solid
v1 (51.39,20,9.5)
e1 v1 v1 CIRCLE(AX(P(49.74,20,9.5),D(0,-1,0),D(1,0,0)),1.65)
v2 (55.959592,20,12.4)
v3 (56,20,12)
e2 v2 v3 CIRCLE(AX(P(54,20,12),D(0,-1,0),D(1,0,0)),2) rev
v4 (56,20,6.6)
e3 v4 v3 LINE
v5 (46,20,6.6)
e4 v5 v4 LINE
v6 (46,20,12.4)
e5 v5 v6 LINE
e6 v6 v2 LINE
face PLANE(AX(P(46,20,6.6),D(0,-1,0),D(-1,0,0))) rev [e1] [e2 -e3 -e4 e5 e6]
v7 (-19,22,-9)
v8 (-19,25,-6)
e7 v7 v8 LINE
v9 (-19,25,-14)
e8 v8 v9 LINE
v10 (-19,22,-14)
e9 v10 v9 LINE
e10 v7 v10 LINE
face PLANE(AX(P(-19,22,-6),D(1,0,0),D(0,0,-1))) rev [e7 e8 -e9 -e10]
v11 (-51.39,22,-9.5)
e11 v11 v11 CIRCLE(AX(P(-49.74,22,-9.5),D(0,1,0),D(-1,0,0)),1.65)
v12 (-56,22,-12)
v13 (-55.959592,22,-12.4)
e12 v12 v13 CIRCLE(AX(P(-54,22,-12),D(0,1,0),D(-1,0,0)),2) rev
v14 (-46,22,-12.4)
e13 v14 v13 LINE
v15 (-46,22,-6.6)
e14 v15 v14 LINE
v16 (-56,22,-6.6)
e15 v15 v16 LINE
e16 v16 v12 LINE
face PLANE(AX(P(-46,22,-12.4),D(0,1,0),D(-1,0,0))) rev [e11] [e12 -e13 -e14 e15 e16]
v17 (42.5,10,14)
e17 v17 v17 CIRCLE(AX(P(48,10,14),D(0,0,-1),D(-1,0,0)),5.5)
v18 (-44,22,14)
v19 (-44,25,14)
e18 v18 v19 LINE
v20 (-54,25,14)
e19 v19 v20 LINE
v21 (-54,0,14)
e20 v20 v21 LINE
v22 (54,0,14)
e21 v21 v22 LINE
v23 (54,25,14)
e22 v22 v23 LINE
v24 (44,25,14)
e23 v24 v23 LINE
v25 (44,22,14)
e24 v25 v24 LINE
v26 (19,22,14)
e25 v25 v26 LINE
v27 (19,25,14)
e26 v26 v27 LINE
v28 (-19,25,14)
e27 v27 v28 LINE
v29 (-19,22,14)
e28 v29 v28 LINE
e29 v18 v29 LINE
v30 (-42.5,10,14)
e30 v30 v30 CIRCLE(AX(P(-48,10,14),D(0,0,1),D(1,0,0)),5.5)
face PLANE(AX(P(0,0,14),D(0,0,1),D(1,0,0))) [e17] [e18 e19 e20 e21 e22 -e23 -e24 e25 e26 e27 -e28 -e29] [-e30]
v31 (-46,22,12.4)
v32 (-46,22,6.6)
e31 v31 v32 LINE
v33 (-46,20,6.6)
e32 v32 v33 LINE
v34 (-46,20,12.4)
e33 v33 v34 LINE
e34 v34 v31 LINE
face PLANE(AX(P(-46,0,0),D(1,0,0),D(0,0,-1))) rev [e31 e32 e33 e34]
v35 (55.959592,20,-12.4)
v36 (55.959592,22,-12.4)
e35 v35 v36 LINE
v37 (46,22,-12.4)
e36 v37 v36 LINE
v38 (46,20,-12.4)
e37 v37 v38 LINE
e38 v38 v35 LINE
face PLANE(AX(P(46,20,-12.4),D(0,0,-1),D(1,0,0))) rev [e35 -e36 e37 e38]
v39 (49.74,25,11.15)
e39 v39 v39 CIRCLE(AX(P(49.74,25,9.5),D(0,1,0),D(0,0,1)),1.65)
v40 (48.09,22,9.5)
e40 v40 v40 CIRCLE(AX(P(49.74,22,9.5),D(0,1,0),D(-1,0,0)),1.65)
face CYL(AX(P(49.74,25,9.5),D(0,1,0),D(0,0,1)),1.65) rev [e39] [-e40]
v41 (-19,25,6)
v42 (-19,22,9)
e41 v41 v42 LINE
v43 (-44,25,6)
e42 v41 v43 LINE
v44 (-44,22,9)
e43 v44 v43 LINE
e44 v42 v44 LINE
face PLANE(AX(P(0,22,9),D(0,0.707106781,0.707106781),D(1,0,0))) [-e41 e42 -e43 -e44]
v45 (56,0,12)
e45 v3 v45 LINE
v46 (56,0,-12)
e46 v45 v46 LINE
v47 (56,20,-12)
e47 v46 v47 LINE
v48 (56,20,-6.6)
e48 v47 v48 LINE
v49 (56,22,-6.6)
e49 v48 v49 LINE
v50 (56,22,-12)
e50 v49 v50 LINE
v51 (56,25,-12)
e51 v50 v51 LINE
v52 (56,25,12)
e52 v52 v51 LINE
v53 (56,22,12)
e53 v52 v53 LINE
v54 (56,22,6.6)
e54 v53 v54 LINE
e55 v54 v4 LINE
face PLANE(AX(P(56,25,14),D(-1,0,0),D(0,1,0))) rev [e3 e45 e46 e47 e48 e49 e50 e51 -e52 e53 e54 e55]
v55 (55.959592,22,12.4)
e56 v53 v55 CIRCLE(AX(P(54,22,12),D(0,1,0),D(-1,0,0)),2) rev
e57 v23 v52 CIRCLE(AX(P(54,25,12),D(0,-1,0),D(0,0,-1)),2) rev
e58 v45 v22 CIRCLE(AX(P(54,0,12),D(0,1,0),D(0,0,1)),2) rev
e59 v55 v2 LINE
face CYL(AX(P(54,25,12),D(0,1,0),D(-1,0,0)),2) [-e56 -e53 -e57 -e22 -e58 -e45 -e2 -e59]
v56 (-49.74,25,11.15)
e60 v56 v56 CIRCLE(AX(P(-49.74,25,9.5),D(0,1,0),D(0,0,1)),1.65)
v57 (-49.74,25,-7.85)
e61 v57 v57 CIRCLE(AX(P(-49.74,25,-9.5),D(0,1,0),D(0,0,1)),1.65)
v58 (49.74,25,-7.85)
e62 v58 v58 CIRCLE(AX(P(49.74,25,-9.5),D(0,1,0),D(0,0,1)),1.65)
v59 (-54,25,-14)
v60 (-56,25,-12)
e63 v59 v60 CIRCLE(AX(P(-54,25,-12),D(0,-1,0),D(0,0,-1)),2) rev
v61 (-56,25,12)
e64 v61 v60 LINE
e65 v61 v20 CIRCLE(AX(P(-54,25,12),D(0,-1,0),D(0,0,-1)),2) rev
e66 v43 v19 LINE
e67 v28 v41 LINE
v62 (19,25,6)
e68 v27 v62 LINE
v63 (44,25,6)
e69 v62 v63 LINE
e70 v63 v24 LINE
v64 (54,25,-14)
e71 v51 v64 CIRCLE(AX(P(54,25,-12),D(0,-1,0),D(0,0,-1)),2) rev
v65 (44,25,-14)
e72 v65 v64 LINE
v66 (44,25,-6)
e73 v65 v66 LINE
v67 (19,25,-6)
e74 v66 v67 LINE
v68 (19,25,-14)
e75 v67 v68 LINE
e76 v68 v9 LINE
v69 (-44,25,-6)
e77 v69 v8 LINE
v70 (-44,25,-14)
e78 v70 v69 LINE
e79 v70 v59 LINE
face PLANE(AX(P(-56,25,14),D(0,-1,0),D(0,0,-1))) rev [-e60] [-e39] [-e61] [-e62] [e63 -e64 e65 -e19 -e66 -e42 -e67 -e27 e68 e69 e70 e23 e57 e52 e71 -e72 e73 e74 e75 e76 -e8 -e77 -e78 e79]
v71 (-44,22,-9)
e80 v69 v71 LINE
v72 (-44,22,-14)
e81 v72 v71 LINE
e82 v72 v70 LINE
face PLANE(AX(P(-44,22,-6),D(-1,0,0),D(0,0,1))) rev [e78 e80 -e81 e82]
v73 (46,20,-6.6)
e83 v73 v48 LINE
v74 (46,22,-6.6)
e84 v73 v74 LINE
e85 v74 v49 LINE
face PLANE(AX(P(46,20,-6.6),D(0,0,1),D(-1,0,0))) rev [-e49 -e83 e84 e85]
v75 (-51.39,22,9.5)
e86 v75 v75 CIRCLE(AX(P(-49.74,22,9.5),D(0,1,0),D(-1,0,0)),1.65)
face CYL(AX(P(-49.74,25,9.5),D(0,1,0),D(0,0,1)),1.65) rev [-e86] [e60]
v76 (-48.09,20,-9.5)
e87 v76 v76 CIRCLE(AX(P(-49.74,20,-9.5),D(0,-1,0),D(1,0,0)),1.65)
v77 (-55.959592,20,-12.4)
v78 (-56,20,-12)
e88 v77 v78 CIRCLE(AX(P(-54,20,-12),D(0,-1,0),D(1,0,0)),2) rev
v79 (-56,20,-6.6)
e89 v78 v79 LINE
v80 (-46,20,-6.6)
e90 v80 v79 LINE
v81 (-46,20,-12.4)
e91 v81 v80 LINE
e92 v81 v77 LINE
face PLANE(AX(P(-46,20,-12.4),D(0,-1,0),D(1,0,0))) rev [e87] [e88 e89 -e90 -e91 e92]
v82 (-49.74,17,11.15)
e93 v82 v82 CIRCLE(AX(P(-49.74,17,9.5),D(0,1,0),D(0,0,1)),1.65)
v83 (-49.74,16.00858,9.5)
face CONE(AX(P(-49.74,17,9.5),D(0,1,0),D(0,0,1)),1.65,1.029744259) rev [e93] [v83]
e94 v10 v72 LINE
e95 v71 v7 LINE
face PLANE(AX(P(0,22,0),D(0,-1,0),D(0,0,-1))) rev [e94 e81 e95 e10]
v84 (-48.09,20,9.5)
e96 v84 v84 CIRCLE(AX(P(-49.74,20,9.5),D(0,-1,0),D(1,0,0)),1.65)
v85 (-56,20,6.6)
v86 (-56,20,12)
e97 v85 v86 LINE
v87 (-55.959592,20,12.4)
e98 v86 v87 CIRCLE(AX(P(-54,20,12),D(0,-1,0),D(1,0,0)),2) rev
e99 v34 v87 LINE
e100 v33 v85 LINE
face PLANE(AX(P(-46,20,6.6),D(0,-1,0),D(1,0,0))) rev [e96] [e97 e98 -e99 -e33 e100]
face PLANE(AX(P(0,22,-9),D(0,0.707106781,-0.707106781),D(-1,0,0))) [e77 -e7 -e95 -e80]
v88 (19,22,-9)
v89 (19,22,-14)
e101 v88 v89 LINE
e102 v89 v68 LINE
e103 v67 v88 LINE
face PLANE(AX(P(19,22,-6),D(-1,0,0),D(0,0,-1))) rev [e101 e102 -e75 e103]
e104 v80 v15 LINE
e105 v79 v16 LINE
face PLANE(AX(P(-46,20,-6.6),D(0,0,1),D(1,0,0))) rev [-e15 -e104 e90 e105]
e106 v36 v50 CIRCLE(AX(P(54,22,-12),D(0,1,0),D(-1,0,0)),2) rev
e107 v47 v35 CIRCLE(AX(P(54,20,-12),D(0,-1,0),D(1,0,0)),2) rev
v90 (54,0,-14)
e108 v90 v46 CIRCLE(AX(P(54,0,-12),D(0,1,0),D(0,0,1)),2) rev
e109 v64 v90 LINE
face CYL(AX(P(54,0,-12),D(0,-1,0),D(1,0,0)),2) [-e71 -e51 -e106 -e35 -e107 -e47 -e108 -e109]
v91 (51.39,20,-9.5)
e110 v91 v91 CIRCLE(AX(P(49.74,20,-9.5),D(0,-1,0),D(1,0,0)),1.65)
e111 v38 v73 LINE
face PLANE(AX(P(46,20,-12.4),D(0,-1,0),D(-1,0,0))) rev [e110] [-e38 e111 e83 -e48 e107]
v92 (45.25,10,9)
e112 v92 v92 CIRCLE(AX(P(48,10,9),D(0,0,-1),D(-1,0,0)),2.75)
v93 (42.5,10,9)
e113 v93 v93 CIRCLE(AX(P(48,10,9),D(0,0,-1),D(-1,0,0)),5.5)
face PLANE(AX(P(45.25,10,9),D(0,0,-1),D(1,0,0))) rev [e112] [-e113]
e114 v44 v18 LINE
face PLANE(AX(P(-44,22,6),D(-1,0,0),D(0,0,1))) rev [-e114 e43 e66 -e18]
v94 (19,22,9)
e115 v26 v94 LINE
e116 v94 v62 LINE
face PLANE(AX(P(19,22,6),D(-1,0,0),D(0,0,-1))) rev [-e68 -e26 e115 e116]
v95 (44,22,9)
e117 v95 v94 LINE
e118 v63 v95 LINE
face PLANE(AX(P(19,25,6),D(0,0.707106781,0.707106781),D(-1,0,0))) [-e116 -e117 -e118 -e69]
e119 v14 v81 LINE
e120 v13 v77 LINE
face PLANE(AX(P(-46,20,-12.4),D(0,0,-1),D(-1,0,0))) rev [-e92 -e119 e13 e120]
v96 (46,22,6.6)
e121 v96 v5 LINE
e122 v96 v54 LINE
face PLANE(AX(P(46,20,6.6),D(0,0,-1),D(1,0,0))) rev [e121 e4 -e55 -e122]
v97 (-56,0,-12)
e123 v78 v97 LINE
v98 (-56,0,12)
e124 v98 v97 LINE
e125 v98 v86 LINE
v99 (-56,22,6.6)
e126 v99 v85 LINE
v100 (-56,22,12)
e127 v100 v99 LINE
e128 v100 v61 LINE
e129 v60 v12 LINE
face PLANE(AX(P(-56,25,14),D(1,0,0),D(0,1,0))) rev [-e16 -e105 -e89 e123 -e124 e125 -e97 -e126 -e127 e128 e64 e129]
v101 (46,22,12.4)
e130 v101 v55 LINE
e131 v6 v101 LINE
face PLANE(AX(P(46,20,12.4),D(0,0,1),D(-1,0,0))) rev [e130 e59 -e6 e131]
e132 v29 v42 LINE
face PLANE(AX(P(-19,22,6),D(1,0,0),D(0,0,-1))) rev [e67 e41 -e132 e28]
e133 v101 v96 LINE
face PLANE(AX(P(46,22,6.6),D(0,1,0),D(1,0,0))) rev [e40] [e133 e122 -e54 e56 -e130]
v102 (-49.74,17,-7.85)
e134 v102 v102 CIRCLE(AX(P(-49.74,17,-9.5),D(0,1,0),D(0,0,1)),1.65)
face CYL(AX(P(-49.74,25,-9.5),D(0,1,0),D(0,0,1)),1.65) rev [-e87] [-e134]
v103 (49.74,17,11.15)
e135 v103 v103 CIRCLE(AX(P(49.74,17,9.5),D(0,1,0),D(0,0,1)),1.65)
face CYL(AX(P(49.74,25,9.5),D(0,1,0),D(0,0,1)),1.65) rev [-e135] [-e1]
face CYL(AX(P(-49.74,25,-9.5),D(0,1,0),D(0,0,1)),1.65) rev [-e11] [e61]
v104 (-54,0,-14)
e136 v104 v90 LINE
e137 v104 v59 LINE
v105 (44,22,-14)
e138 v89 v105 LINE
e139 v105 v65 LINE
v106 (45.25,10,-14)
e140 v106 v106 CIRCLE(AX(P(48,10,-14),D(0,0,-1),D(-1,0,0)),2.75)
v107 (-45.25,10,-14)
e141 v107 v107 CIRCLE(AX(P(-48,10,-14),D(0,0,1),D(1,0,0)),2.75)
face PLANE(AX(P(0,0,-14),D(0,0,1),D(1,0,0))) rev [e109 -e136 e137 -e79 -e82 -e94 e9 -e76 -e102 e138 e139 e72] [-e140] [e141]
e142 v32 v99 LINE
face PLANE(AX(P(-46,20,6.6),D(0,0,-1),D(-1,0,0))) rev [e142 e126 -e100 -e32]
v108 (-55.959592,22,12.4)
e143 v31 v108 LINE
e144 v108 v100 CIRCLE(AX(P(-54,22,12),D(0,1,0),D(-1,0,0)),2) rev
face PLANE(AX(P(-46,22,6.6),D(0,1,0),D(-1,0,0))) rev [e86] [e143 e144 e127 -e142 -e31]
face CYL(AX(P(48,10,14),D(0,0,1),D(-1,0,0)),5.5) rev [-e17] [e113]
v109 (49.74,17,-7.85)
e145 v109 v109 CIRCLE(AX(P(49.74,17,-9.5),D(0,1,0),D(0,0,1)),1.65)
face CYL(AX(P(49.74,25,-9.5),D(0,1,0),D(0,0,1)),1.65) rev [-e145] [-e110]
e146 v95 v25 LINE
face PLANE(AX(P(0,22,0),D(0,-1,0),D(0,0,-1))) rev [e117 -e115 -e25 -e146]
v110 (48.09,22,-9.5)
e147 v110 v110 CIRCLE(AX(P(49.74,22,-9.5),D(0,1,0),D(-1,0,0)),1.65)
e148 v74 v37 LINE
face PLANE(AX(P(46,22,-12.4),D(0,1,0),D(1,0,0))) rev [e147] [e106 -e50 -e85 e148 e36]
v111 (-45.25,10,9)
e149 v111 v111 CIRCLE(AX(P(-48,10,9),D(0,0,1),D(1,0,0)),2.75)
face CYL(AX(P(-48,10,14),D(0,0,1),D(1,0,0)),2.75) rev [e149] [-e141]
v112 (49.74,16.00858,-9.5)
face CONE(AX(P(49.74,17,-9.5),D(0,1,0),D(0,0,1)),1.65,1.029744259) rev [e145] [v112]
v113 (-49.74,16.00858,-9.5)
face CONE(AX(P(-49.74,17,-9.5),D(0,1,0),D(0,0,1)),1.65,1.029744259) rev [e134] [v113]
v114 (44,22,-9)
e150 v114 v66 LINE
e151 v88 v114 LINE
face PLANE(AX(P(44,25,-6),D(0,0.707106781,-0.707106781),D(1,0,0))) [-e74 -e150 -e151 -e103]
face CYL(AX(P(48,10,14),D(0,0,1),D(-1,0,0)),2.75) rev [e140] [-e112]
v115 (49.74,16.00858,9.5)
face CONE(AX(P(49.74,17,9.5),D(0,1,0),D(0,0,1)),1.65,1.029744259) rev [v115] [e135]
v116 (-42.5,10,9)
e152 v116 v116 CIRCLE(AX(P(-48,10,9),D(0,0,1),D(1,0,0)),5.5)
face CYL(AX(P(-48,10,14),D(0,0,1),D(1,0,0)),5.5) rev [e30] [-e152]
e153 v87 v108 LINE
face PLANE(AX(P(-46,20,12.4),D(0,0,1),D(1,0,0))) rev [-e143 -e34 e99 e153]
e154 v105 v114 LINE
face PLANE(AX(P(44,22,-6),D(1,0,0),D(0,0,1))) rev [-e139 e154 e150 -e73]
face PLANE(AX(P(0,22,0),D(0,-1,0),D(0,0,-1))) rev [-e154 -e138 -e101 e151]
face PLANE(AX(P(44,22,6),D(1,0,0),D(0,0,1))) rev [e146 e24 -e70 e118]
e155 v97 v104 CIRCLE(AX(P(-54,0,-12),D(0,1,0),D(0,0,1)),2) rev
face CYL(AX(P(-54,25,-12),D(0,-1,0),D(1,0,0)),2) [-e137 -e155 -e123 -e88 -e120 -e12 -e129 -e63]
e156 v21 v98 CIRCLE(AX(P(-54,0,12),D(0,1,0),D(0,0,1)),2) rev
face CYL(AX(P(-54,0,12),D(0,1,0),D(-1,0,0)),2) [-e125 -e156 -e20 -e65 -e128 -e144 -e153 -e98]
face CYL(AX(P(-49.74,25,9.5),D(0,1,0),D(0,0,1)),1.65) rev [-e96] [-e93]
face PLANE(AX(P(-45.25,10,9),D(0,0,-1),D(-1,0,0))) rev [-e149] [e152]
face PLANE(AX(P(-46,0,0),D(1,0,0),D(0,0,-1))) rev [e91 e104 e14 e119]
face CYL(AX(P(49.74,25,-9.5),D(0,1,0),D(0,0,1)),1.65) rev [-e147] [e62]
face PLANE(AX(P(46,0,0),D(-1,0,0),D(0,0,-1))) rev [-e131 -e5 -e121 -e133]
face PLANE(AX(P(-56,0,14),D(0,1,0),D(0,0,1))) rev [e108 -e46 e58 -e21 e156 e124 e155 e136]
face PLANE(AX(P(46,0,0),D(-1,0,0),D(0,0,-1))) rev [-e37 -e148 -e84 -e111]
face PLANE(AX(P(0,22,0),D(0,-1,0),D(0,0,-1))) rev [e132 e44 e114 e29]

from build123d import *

# Parameters (mm, degrees)
SKETCH1_W                               = 56
SKETCH1_H                               = 25
BOSS_EXTRUDE1_DEPTH                     = 14
CBORE_FOR_M5_HEX_HEAD_BOLT1_D           = 5.5
CBORE_FOR_M5_HEX_HEAD_BOLT1_CBORE_D     = 11
CBORE_FOR_M5_HEX_HEAD_BOLT1_CBORE_DEPTH = 5
SKETCH9_W                               = 25
SKETCH9_H                               = 8
CUT_EXTRUDE2_DEPTH                      = 3
SKETCH8_W                               = 5.8
SKETCH8_H                               = 2
CUT_EXTRUDE1_DEPTH                      = 10
F_3_0MM_DOWEL_HOLE1_D                   = 3.3
F_3_0MM_DOWEL_HOLE1_DEPTH               = 8
F_3_0MM_DOWEL_HOLE1_TIP                 = 0.991420021
FILLET1_R                               = 2
CHAMFER2_SIZE                           = 3


# Some blends are built 0.0001 mm under size
with BuildPart() as part:
    # Sketch1 → Boss-Extrude1 (new, symmetric)
    with BuildSketch(Plane.XY):
        with Locations((-28, 12.5)):
            Rectangle(SKETCH1_W, SKETCH1_H)
    extrude(amount=BOSS_EXTRUDE1_DEPTH, both=True)

    # CBORE for M5 Hex Head Bolt1 (through all)
    with Locations(Plane.XY.offset(14)):
        with Locations((-48, 10)):
            CounterBoreHole(CBORE_FOR_M5_HEX_HEAD_BOLT1_D / 2, CBORE_FOR_M5_HEX_HEAD_BOLT1_CBORE_D / 2, CBORE_FOR_M5_HEX_HEAD_BOLT1_CBORE_DEPTH)

    # Sketch9 → Cut-Extrude2 (cut)
    with BuildSketch(Plane(origin=(0, 25, 0), x_dir=(1, 0, 0), z_dir=(0, 1, 0))):
        with Locations((-31.5, 10)):
            Rectangle(SKETCH9_W, SKETCH9_H)
        with Locations((-31.5, -10)):
            Rectangle(SKETCH9_W, SKETCH9_H)
    extrude(amount=-CUT_EXTRUDE2_DEPTH, mode=Mode.SUBTRACT)

    # Sketch8 → Cut-Extrude1 (cut)
    with BuildSketch(Plane.ZY.offset(56)):
        with Locations((-9.5, 21)):
            Rectangle(SKETCH8_W, SKETCH8_H)
        with Locations((9.5, 21)):
            Rectangle(SKETCH8_W, SKETCH8_H)
    extrude(amount=-CUT_EXTRUDE1_DEPTH, mode=Mode.SUBTRACT)

    # Mirror1: part across plane


with BuildPart() as part_1:
    add(part.part)
    add(part.part.mirror(Plane(origin=(0, 25, 14), x_dir=(0, 0, 1), z_dir=(-1, 0, 0))))

    # Ø3.0mm Dowel Hole1
    with Locations(Plane(origin=(0, 25, 0), x_dir=(1, 0, 0), z_dir=(0, 1, 0))):
        with Locations((49.74, 9.5), (-49.74, -9.5), (-49.74, 9.5), (49.74, -9.5)):
            Hole(F_3_0MM_DOWEL_HOLE1_D / 2, depth=F_3_0MM_DOWEL_HOLE1_DEPTH)
            with Locations((0, 0, -(F_3_0MM_DOWEL_HOLE1_DEPTH + F_3_0MM_DOWEL_HOLE1_TIP / 2))):  # 118° drill point
                Cone(0, F_3_0MM_DOWEL_HOLE1_D / 2, F_3_0MM_DOWEL_HOLE1_TIP, mode=Mode.SUBTRACT)

    # Fillet1
    # the kernel refuses this fillet: 2 mm, written as the material it takes off along each edge
    with BuildSketch(Plane(origin=(-56, 30, -14), x_dir=(0, 0, 1), z_dir=(0, -1, 0)), Plane(origin=(56, 30, -14), x_dir=(-1, 0, 0), z_dir=(0, -1, 0))) as fillet1_piece_1:
        with BuildLine():
            CenterArc((FILLET1_R, -FILLET1_R), FILLET1_R, 90, 90)
            Line((0, -FILLET1_R), (0, 0))
            Line((0, 0), (FILLET1_R, 0))
        make_face()
    extrude(amount=35, mode=Mode.SUBTRACT)
    with BuildSketch(Plane(origin=(-56, 30, 14), x_dir=(0, 0, -1), z_dir=(0, -1, 0)), Plane(origin=(56, 30, 14), x_dir=(-1, 0, 0), z_dir=(0, -1, 0))) as fillet1_piece_2:
        with BuildLine():
            CenterArc((FILLET1_R, FILLET1_R), FILLET1_R, 180, 90)
            Line((0, FILLET1_R), (0, 0))
            Line((0, 0), (FILLET1_R, 0))
        make_face()
    extrude(amount=35, mode=Mode.SUBTRACT)

    # Chamfer2
    chamfer2_edges = [part_1.edges().sort_by_distance(p)[0] for p in [
        (-31.5, 22, 6),
        (31.5, 22, 6),
        (-31.5, 22, -6),
        (31.5, 22, -6),
    ]]
    chamfer(chamfer2_edges, length=CHAMFER2_SIZE - 0.0001)  # a hair under: the kernel refuses the full size


solid = part_1.part
